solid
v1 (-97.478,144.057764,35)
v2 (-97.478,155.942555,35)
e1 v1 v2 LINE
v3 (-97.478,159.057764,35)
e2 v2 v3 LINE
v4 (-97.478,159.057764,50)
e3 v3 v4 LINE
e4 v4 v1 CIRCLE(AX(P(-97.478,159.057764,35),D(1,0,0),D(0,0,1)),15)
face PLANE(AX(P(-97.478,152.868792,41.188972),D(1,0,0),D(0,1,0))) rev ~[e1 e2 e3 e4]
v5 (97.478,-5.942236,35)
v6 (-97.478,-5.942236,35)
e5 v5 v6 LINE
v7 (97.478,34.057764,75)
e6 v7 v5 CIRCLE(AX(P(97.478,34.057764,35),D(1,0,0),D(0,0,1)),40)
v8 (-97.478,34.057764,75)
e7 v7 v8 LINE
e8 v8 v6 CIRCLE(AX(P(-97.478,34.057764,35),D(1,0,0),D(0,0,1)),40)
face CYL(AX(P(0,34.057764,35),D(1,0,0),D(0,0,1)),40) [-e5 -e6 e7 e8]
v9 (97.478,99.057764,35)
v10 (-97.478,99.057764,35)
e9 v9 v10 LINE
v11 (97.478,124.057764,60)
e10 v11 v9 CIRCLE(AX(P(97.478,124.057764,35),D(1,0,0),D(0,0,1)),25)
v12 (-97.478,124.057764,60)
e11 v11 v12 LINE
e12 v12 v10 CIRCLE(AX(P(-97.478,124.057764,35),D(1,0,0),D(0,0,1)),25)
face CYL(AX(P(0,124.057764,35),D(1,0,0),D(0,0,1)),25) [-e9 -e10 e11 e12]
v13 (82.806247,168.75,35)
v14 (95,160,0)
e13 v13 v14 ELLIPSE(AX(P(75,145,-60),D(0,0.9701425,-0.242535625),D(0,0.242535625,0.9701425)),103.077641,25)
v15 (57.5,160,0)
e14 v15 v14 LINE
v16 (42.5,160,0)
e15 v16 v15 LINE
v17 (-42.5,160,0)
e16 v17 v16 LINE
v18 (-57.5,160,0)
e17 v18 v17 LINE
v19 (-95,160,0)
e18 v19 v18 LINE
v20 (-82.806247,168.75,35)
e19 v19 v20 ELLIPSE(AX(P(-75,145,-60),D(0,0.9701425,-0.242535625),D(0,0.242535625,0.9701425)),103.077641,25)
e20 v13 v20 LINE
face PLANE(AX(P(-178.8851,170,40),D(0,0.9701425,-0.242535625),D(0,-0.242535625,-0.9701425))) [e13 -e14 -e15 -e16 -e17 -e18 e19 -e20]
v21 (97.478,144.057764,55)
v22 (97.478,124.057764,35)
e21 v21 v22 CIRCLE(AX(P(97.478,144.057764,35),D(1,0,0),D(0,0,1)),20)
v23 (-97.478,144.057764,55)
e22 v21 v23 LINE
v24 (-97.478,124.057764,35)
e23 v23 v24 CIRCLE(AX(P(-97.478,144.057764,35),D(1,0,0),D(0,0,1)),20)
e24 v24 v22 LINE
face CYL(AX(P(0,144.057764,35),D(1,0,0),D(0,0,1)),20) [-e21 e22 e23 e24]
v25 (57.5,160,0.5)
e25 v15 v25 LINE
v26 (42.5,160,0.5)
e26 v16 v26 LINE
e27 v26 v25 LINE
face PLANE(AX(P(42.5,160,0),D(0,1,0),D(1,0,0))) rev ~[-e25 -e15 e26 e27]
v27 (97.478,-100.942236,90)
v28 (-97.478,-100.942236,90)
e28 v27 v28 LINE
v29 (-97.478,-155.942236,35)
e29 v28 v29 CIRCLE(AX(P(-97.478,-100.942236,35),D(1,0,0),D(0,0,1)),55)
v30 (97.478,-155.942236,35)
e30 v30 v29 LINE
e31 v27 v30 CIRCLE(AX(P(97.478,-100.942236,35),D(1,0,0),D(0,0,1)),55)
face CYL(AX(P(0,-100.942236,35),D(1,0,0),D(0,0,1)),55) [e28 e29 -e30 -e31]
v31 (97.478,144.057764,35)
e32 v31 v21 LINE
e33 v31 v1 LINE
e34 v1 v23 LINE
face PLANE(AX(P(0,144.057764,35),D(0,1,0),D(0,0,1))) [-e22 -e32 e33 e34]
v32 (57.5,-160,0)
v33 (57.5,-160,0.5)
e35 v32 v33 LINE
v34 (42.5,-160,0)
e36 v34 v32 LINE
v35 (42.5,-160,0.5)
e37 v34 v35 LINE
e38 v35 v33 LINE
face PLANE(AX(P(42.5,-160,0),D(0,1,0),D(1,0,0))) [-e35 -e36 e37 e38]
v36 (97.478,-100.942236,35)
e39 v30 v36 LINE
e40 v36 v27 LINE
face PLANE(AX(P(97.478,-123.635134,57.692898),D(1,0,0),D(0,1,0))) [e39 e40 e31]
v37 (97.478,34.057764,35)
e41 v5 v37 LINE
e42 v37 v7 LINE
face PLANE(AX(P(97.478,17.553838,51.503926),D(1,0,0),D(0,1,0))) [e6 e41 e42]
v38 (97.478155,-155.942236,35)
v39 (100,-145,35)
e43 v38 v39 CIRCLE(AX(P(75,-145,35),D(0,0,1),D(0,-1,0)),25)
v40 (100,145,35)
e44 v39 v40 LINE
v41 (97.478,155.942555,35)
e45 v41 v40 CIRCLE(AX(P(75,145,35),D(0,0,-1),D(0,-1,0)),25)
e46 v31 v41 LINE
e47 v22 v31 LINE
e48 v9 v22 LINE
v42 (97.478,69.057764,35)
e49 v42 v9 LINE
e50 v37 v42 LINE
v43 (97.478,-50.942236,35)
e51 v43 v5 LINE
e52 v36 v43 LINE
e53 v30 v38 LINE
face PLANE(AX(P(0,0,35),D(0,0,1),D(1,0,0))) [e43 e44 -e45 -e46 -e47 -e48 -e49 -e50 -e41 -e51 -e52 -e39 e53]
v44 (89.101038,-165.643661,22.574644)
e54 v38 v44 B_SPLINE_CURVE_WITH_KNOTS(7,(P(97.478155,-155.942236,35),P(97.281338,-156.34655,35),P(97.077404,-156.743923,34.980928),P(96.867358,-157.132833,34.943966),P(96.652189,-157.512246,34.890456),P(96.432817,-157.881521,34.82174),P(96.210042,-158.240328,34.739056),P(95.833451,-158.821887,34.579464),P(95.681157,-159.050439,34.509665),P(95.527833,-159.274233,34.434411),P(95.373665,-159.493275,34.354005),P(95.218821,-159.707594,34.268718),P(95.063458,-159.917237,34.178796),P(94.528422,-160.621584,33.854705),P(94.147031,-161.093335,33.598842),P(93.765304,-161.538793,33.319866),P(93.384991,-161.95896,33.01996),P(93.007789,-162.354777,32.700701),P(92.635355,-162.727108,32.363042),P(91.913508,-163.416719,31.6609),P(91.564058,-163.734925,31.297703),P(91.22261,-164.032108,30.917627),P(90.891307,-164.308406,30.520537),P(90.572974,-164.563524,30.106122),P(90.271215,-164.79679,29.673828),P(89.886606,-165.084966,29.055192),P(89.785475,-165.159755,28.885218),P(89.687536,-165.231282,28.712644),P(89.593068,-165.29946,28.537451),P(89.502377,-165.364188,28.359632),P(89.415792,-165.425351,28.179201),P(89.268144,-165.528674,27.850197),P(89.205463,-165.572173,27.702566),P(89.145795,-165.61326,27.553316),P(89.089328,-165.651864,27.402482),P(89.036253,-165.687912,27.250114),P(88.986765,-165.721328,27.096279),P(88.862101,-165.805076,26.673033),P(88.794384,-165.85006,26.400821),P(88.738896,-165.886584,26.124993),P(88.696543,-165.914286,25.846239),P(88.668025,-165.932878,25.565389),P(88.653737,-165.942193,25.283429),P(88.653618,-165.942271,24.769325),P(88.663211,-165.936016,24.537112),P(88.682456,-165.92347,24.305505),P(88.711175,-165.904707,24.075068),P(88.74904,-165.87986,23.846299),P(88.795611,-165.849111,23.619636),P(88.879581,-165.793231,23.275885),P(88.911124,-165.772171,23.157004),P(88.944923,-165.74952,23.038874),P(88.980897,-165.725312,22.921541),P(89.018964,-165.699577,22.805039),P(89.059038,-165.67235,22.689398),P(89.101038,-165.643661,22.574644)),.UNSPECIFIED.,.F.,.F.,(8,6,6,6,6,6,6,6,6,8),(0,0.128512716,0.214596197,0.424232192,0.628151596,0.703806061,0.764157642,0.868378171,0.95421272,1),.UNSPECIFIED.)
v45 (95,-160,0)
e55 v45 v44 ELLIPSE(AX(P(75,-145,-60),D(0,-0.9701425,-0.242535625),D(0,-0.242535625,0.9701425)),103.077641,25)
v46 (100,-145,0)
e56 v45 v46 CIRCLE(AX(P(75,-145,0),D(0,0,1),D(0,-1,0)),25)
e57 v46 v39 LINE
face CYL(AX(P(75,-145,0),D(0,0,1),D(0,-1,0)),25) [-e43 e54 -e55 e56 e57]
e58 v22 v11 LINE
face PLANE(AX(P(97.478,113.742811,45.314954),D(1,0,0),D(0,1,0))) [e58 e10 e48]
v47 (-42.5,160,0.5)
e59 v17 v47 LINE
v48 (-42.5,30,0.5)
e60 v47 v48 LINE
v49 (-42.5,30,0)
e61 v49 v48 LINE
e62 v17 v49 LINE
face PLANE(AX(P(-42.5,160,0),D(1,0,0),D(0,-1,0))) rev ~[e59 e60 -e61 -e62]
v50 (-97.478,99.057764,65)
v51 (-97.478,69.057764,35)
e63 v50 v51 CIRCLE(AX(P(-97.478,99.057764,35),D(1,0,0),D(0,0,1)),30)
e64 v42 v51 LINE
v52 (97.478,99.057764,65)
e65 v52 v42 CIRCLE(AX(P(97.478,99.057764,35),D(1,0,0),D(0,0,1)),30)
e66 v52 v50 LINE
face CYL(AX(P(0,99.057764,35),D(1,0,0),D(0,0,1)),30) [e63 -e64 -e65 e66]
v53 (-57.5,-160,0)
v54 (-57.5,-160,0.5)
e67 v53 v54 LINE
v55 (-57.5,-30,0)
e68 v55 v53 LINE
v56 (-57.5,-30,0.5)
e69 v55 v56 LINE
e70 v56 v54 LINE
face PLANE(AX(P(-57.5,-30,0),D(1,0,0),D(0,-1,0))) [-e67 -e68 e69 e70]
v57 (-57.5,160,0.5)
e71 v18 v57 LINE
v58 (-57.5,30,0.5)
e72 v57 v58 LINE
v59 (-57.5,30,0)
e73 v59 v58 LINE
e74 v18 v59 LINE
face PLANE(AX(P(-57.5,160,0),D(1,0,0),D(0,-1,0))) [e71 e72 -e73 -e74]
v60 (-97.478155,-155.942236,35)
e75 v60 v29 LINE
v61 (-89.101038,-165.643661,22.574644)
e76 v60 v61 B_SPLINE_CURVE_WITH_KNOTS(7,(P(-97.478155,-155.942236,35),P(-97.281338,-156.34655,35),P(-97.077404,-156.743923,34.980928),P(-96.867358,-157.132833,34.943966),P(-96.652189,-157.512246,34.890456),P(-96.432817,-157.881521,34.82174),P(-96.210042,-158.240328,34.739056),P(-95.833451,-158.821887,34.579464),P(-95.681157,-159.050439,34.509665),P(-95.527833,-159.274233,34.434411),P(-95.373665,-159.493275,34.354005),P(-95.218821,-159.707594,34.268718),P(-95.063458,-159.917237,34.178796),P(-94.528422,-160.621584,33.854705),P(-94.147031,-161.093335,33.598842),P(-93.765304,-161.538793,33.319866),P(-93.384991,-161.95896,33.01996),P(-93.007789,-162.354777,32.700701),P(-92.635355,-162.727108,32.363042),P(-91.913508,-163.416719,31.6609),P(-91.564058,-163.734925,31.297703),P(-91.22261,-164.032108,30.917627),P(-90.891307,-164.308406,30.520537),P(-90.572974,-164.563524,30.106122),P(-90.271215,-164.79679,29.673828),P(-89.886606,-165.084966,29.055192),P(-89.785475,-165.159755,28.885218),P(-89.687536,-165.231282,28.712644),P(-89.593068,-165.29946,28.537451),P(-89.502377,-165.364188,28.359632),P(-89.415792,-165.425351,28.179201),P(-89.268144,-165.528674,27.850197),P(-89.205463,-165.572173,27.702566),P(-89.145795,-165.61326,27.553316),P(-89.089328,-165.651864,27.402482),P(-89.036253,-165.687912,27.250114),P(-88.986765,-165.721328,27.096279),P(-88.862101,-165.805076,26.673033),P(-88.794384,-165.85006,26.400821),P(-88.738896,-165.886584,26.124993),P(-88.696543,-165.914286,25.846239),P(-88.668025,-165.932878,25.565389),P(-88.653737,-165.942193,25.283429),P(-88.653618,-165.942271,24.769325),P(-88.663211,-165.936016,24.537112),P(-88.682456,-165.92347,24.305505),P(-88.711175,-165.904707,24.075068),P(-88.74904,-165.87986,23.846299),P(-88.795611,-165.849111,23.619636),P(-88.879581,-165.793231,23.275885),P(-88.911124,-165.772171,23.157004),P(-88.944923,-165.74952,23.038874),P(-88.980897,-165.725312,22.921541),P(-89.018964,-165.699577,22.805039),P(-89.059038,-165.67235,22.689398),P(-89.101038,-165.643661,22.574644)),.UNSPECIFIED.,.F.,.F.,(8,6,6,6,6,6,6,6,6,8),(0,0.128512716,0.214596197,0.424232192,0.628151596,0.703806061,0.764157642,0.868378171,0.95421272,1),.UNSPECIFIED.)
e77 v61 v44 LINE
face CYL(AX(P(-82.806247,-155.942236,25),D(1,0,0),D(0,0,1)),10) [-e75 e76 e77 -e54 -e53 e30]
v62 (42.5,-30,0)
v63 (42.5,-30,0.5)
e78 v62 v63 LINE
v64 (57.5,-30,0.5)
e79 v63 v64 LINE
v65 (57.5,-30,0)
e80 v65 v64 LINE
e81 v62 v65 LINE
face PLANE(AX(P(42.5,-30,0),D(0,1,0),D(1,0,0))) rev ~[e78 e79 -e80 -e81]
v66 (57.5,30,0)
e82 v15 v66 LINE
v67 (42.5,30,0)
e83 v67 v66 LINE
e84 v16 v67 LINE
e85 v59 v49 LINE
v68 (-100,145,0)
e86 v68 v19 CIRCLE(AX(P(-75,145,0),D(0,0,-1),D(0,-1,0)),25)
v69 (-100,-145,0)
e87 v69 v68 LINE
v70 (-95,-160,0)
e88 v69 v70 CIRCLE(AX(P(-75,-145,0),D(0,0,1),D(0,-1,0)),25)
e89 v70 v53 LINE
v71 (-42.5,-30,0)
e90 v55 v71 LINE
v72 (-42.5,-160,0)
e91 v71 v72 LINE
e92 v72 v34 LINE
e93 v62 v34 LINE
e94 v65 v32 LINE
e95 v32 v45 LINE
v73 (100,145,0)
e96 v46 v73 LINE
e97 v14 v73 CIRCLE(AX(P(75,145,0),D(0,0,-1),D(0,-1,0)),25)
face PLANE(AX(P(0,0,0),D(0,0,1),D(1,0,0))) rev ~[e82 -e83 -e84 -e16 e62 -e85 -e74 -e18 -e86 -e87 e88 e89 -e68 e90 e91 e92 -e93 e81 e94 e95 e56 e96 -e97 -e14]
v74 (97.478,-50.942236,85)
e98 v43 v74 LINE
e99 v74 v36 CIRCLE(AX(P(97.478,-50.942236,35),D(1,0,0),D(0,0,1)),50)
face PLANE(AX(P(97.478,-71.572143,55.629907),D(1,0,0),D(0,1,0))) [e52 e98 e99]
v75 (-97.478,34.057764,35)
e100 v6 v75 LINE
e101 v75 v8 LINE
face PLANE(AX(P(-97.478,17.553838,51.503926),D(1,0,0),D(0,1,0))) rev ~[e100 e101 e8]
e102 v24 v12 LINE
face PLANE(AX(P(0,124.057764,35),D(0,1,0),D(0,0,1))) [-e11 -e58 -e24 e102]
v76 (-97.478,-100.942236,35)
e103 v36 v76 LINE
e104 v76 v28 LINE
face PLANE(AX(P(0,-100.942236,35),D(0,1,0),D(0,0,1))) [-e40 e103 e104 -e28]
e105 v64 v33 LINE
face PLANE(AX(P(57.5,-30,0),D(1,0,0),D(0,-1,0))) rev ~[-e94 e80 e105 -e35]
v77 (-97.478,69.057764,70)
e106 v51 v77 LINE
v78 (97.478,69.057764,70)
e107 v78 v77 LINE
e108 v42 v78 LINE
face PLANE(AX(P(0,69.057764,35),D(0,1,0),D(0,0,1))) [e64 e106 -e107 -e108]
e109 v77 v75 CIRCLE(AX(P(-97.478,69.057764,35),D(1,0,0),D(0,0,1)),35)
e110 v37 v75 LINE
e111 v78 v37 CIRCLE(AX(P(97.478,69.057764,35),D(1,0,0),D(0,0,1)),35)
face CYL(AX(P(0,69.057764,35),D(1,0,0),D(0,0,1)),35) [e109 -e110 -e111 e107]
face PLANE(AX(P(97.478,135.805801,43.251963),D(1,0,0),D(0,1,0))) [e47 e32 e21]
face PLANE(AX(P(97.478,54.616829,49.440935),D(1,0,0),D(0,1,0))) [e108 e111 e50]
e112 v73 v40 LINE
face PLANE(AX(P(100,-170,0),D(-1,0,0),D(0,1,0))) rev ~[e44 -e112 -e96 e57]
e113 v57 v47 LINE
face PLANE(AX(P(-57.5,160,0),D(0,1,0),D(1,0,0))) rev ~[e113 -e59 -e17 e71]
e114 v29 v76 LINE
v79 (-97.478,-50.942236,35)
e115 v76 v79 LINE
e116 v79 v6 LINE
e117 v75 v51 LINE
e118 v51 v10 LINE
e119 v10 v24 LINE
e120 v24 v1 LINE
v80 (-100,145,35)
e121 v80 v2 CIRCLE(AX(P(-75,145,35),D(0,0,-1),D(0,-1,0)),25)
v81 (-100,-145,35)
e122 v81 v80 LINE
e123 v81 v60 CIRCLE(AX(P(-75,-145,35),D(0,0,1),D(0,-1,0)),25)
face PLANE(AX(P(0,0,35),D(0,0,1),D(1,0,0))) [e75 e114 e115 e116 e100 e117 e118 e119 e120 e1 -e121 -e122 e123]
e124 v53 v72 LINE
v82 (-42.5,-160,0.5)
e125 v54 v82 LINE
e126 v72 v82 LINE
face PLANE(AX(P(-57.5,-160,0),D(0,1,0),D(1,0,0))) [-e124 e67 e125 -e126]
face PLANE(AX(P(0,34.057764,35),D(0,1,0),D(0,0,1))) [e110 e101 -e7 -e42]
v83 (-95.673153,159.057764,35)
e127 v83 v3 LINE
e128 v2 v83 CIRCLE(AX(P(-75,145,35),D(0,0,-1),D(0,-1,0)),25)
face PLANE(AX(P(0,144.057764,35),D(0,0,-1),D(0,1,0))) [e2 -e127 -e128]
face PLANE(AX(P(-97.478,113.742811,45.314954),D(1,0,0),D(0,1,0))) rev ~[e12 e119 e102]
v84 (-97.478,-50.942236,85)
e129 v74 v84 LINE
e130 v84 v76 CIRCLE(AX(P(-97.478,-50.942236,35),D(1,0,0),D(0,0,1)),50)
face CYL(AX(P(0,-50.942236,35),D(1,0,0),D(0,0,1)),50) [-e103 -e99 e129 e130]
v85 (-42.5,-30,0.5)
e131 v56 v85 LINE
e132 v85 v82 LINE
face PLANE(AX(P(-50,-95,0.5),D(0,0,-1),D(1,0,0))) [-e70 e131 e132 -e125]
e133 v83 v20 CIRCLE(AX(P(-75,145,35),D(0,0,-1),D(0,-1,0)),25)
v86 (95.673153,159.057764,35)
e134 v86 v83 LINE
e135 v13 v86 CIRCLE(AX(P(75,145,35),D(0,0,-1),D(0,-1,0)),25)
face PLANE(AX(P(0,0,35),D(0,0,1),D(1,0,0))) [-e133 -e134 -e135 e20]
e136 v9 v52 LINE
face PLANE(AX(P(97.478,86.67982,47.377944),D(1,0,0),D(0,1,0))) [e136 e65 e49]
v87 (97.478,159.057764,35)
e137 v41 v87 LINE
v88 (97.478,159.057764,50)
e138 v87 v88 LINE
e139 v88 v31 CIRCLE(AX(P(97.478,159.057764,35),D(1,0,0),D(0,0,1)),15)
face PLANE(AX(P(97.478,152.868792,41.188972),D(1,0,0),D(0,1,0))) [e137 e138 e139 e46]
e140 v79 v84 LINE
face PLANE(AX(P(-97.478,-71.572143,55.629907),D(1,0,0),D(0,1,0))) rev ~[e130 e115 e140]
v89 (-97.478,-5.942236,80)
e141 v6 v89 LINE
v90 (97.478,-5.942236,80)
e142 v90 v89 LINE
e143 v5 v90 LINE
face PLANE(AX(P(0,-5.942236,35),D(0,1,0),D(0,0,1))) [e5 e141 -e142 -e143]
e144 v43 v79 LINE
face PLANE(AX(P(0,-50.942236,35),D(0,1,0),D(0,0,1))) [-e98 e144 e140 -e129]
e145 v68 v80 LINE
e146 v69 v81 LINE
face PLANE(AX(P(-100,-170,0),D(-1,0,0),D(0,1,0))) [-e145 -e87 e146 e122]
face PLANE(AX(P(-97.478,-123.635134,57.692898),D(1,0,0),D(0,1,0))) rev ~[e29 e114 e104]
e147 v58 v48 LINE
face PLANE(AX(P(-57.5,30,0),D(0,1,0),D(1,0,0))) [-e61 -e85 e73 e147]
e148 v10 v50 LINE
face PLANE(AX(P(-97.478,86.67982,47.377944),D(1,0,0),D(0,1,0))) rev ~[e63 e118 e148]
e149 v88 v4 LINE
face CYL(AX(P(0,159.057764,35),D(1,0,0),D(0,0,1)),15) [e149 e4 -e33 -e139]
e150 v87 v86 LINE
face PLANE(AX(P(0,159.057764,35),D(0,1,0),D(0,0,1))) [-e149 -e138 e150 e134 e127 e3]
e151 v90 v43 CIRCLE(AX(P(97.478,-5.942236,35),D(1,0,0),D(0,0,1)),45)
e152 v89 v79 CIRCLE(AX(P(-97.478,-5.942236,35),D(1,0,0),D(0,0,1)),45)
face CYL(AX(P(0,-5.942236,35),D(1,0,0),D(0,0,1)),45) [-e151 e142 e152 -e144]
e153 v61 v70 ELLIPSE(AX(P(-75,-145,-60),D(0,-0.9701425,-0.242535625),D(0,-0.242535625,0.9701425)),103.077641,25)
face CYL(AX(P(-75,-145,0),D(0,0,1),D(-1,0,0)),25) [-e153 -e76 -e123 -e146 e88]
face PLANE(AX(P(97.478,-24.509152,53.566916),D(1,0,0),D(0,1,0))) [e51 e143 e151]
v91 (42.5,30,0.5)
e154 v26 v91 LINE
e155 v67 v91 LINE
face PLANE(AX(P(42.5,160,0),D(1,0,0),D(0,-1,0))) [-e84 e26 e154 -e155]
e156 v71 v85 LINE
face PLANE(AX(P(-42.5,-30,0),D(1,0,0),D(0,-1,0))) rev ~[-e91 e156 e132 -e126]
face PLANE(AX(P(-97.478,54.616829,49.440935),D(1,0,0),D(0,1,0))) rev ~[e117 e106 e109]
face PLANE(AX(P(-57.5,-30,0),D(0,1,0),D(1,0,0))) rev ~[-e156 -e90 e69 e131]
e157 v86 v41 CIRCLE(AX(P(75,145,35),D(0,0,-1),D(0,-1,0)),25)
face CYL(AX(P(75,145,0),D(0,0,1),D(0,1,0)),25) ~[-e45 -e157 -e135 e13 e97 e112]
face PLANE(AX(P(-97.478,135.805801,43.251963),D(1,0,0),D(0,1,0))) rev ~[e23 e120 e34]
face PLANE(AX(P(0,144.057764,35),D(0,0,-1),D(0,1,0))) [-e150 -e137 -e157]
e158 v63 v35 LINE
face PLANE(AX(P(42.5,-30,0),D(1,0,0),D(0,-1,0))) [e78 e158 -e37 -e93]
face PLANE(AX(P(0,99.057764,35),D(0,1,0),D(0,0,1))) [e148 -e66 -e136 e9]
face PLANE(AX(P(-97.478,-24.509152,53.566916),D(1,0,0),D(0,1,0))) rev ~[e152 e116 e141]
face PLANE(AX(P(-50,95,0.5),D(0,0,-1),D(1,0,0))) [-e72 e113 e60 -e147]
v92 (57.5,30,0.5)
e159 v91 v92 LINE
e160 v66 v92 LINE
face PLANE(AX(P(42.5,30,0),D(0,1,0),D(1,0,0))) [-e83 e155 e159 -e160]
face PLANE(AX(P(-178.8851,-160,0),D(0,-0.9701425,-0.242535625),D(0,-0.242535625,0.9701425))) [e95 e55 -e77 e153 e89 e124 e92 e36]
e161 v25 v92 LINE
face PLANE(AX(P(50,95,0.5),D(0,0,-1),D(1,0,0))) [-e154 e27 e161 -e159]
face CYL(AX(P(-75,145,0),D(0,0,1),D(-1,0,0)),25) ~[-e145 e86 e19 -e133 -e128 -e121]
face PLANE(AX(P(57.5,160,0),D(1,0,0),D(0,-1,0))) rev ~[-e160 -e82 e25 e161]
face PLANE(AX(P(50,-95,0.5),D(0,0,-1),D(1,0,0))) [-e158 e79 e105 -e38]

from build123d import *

# Parameters (mm, degrees)
F0_W        = 200
F0_H        = 340
F1_DEPTH    = 35
F2_W        = 15
F2_H        = 130
F3_DEPTH    = 0.5
F4_R        = 25
F5_T1_DEPTH = 357.7701999818
F6_R        = 10
F8_DEPTH    = 97.478


# Not quite as in the source:
# - a fillet or chamfer that OpenCascade refuses, or shapes differently, is made with other operations: its cross-section is extruded or revolved along the edge and cut away or added


with BuildPart() as f1:
    # F0 (on Top) → F1 (new body)
    with BuildSketch(Plane.XY):
        Rectangle(F0_W, F0_H)
    extrude(amount=F1_DEPTH)

    # F2 (on face) → F3 (cut)
    with BuildSketch(Plane(origin=(0, 0, 0), x_dir=(1, 0, 0), z_dir=(0, 0, -1))):
        with Locations((-50, 95)):
            Rectangle(F2_W, F2_H)
        with Locations((50, 95)):
            Rectangle(F2_W, F2_H)
        with Locations((-50, -95)):
            Rectangle(F2_W, F2_H)
        with Locations((50, -95)):
            Rectangle(F2_W, F2_H)
    extrude(amount=-F3_DEPTH, mode=Mode.SUBTRACT)

    # F4
    f4_edges = [f1.edges().sort_by_distance(p)[0] for p in [
        (100, -170, 17.5),
        (-100, -170, 17.5),
        (100, 170, 17.5),
        (-100, 170, 17.5),
    ]]
    fillet(f4_edges, radius=F4_R)

    # F5: chamfer of 40 x 10 on 2 edges, made by hand

    # F5_s2 → F5_t1 (cut)
    with BuildSketch(Plane.YZ.offset(-178.8850999909)):
        Polygon((-160, 0), (-170, 40), (-170, 0), align=None)
        Polygon((170, 40), (160, 0), (170, 0), align=None)
    extrude(amount=F5_T1_DEPTH, mode=Mode.SUBTRACT)

    # F6
    f6_edges = [f1.edges().sort_by_distance(p)[0] for p in [
        (0, -168.75, 35),
    ]]
    fillet(f6_edges, radius=F6_R)

    # F7 (on Right) → F8 (join, symmetric)
    with BuildSketch(Plane.YZ):
        with BuildLine():
            Line((-155.942235936, 35), (-100.942235936, 35))
            Line((-100.942235936, 35), (-100.942235936, 90))
            ThreePointArc((-100.942235936, 90), (-139.8331089012, 73.8908729653), (-155.942235936, 35))
        make_face()
        with BuildLine():
            ThreePointArc((-50.942235936, 85), (-86.2975749953, 70.3553390593), (-100.942235936, 35))
            Line((-100.942235936, 35), (-50.942235936, 35))
            Line((-50.942235936, 35), (-50.942235936, 85))
        make_face()
        with BuildLine():
            ThreePointArc((-5.942235936, 80), (-37.7620410894, 66.8198051534), (-50.942235936, 35))
            Line((-50.942235936, 35), (-5.942235936, 35))
            Line((-5.942235936, 35), (-5.942235936, 75))
            Line((-5.942235936, 75), (-5.942235936, 80))
        make_face()
        with BuildLine():
            ThreePointArc((159.057764064, 50), (148.4511623462, 45.6066017178), (144.057764064, 35))
            Line((144.057764064, 35), (159.057764064, 35))
            Line((159.057764064, 35), (159.057764064, 50))
        make_face()
        with BuildLine():
            ThreePointArc((34.057764064, 75), (5.7734928166, 63.2842712475), (-5.942235936, 35))
            Line((-5.942235936, 35), (34.057764064, 35))
            Line((34.057764064, 35), (34.057764064, 70))
            Line((34.057764064, 70), (34.057764064, 75))
        make_face()
        with BuildLine():
            ThreePointArc((69.057764064, 70), (44.3090267225, 59.7487373415), (34.057764064, 35))
            Line((34.057764064, 35), (69.057764064, 35))
            Line((69.057764064, 35), (69.057764064, 65))
            Line((69.057764064, 65), (69.057764064, 70))
        make_face()
        with BuildLine():
            ThreePointArc((99.057764064, 65), (77.8445606284, 56.2132034356), (69.057764064, 35))
            Line((69.057764064, 35), (99.057764064, 35))
            Line((99.057764064, 35), (99.057764064, 60))
            Line((99.057764064, 60), (99.057764064, 65))
        make_face()
        with BuildLine():
            ThreePointArc((124.057764064, 60), (106.3800945344, 52.6776695297), (99.057764064, 35))
            Line((99.057764064, 35), (124.057764064, 35))
            Line((124.057764064, 35), (124.057764064, 55))
            Line((124.057764064, 55), (124.057764064, 60))
        make_face()
        with BuildLine():
            ThreePointArc((144.057764064, 55), (129.9156284403, 49.1421356237), (124.057764064, 35))
            Line((124.057764064, 35), (144.057764064, 35))
            Line((144.057764064, 35), (144.057764064, 50))
            Line((144.057764064, 50), (144.057764064, 55))
        make_face()
    extrude(amount=F8_DEPTH, both=True)


solid = f1.part
